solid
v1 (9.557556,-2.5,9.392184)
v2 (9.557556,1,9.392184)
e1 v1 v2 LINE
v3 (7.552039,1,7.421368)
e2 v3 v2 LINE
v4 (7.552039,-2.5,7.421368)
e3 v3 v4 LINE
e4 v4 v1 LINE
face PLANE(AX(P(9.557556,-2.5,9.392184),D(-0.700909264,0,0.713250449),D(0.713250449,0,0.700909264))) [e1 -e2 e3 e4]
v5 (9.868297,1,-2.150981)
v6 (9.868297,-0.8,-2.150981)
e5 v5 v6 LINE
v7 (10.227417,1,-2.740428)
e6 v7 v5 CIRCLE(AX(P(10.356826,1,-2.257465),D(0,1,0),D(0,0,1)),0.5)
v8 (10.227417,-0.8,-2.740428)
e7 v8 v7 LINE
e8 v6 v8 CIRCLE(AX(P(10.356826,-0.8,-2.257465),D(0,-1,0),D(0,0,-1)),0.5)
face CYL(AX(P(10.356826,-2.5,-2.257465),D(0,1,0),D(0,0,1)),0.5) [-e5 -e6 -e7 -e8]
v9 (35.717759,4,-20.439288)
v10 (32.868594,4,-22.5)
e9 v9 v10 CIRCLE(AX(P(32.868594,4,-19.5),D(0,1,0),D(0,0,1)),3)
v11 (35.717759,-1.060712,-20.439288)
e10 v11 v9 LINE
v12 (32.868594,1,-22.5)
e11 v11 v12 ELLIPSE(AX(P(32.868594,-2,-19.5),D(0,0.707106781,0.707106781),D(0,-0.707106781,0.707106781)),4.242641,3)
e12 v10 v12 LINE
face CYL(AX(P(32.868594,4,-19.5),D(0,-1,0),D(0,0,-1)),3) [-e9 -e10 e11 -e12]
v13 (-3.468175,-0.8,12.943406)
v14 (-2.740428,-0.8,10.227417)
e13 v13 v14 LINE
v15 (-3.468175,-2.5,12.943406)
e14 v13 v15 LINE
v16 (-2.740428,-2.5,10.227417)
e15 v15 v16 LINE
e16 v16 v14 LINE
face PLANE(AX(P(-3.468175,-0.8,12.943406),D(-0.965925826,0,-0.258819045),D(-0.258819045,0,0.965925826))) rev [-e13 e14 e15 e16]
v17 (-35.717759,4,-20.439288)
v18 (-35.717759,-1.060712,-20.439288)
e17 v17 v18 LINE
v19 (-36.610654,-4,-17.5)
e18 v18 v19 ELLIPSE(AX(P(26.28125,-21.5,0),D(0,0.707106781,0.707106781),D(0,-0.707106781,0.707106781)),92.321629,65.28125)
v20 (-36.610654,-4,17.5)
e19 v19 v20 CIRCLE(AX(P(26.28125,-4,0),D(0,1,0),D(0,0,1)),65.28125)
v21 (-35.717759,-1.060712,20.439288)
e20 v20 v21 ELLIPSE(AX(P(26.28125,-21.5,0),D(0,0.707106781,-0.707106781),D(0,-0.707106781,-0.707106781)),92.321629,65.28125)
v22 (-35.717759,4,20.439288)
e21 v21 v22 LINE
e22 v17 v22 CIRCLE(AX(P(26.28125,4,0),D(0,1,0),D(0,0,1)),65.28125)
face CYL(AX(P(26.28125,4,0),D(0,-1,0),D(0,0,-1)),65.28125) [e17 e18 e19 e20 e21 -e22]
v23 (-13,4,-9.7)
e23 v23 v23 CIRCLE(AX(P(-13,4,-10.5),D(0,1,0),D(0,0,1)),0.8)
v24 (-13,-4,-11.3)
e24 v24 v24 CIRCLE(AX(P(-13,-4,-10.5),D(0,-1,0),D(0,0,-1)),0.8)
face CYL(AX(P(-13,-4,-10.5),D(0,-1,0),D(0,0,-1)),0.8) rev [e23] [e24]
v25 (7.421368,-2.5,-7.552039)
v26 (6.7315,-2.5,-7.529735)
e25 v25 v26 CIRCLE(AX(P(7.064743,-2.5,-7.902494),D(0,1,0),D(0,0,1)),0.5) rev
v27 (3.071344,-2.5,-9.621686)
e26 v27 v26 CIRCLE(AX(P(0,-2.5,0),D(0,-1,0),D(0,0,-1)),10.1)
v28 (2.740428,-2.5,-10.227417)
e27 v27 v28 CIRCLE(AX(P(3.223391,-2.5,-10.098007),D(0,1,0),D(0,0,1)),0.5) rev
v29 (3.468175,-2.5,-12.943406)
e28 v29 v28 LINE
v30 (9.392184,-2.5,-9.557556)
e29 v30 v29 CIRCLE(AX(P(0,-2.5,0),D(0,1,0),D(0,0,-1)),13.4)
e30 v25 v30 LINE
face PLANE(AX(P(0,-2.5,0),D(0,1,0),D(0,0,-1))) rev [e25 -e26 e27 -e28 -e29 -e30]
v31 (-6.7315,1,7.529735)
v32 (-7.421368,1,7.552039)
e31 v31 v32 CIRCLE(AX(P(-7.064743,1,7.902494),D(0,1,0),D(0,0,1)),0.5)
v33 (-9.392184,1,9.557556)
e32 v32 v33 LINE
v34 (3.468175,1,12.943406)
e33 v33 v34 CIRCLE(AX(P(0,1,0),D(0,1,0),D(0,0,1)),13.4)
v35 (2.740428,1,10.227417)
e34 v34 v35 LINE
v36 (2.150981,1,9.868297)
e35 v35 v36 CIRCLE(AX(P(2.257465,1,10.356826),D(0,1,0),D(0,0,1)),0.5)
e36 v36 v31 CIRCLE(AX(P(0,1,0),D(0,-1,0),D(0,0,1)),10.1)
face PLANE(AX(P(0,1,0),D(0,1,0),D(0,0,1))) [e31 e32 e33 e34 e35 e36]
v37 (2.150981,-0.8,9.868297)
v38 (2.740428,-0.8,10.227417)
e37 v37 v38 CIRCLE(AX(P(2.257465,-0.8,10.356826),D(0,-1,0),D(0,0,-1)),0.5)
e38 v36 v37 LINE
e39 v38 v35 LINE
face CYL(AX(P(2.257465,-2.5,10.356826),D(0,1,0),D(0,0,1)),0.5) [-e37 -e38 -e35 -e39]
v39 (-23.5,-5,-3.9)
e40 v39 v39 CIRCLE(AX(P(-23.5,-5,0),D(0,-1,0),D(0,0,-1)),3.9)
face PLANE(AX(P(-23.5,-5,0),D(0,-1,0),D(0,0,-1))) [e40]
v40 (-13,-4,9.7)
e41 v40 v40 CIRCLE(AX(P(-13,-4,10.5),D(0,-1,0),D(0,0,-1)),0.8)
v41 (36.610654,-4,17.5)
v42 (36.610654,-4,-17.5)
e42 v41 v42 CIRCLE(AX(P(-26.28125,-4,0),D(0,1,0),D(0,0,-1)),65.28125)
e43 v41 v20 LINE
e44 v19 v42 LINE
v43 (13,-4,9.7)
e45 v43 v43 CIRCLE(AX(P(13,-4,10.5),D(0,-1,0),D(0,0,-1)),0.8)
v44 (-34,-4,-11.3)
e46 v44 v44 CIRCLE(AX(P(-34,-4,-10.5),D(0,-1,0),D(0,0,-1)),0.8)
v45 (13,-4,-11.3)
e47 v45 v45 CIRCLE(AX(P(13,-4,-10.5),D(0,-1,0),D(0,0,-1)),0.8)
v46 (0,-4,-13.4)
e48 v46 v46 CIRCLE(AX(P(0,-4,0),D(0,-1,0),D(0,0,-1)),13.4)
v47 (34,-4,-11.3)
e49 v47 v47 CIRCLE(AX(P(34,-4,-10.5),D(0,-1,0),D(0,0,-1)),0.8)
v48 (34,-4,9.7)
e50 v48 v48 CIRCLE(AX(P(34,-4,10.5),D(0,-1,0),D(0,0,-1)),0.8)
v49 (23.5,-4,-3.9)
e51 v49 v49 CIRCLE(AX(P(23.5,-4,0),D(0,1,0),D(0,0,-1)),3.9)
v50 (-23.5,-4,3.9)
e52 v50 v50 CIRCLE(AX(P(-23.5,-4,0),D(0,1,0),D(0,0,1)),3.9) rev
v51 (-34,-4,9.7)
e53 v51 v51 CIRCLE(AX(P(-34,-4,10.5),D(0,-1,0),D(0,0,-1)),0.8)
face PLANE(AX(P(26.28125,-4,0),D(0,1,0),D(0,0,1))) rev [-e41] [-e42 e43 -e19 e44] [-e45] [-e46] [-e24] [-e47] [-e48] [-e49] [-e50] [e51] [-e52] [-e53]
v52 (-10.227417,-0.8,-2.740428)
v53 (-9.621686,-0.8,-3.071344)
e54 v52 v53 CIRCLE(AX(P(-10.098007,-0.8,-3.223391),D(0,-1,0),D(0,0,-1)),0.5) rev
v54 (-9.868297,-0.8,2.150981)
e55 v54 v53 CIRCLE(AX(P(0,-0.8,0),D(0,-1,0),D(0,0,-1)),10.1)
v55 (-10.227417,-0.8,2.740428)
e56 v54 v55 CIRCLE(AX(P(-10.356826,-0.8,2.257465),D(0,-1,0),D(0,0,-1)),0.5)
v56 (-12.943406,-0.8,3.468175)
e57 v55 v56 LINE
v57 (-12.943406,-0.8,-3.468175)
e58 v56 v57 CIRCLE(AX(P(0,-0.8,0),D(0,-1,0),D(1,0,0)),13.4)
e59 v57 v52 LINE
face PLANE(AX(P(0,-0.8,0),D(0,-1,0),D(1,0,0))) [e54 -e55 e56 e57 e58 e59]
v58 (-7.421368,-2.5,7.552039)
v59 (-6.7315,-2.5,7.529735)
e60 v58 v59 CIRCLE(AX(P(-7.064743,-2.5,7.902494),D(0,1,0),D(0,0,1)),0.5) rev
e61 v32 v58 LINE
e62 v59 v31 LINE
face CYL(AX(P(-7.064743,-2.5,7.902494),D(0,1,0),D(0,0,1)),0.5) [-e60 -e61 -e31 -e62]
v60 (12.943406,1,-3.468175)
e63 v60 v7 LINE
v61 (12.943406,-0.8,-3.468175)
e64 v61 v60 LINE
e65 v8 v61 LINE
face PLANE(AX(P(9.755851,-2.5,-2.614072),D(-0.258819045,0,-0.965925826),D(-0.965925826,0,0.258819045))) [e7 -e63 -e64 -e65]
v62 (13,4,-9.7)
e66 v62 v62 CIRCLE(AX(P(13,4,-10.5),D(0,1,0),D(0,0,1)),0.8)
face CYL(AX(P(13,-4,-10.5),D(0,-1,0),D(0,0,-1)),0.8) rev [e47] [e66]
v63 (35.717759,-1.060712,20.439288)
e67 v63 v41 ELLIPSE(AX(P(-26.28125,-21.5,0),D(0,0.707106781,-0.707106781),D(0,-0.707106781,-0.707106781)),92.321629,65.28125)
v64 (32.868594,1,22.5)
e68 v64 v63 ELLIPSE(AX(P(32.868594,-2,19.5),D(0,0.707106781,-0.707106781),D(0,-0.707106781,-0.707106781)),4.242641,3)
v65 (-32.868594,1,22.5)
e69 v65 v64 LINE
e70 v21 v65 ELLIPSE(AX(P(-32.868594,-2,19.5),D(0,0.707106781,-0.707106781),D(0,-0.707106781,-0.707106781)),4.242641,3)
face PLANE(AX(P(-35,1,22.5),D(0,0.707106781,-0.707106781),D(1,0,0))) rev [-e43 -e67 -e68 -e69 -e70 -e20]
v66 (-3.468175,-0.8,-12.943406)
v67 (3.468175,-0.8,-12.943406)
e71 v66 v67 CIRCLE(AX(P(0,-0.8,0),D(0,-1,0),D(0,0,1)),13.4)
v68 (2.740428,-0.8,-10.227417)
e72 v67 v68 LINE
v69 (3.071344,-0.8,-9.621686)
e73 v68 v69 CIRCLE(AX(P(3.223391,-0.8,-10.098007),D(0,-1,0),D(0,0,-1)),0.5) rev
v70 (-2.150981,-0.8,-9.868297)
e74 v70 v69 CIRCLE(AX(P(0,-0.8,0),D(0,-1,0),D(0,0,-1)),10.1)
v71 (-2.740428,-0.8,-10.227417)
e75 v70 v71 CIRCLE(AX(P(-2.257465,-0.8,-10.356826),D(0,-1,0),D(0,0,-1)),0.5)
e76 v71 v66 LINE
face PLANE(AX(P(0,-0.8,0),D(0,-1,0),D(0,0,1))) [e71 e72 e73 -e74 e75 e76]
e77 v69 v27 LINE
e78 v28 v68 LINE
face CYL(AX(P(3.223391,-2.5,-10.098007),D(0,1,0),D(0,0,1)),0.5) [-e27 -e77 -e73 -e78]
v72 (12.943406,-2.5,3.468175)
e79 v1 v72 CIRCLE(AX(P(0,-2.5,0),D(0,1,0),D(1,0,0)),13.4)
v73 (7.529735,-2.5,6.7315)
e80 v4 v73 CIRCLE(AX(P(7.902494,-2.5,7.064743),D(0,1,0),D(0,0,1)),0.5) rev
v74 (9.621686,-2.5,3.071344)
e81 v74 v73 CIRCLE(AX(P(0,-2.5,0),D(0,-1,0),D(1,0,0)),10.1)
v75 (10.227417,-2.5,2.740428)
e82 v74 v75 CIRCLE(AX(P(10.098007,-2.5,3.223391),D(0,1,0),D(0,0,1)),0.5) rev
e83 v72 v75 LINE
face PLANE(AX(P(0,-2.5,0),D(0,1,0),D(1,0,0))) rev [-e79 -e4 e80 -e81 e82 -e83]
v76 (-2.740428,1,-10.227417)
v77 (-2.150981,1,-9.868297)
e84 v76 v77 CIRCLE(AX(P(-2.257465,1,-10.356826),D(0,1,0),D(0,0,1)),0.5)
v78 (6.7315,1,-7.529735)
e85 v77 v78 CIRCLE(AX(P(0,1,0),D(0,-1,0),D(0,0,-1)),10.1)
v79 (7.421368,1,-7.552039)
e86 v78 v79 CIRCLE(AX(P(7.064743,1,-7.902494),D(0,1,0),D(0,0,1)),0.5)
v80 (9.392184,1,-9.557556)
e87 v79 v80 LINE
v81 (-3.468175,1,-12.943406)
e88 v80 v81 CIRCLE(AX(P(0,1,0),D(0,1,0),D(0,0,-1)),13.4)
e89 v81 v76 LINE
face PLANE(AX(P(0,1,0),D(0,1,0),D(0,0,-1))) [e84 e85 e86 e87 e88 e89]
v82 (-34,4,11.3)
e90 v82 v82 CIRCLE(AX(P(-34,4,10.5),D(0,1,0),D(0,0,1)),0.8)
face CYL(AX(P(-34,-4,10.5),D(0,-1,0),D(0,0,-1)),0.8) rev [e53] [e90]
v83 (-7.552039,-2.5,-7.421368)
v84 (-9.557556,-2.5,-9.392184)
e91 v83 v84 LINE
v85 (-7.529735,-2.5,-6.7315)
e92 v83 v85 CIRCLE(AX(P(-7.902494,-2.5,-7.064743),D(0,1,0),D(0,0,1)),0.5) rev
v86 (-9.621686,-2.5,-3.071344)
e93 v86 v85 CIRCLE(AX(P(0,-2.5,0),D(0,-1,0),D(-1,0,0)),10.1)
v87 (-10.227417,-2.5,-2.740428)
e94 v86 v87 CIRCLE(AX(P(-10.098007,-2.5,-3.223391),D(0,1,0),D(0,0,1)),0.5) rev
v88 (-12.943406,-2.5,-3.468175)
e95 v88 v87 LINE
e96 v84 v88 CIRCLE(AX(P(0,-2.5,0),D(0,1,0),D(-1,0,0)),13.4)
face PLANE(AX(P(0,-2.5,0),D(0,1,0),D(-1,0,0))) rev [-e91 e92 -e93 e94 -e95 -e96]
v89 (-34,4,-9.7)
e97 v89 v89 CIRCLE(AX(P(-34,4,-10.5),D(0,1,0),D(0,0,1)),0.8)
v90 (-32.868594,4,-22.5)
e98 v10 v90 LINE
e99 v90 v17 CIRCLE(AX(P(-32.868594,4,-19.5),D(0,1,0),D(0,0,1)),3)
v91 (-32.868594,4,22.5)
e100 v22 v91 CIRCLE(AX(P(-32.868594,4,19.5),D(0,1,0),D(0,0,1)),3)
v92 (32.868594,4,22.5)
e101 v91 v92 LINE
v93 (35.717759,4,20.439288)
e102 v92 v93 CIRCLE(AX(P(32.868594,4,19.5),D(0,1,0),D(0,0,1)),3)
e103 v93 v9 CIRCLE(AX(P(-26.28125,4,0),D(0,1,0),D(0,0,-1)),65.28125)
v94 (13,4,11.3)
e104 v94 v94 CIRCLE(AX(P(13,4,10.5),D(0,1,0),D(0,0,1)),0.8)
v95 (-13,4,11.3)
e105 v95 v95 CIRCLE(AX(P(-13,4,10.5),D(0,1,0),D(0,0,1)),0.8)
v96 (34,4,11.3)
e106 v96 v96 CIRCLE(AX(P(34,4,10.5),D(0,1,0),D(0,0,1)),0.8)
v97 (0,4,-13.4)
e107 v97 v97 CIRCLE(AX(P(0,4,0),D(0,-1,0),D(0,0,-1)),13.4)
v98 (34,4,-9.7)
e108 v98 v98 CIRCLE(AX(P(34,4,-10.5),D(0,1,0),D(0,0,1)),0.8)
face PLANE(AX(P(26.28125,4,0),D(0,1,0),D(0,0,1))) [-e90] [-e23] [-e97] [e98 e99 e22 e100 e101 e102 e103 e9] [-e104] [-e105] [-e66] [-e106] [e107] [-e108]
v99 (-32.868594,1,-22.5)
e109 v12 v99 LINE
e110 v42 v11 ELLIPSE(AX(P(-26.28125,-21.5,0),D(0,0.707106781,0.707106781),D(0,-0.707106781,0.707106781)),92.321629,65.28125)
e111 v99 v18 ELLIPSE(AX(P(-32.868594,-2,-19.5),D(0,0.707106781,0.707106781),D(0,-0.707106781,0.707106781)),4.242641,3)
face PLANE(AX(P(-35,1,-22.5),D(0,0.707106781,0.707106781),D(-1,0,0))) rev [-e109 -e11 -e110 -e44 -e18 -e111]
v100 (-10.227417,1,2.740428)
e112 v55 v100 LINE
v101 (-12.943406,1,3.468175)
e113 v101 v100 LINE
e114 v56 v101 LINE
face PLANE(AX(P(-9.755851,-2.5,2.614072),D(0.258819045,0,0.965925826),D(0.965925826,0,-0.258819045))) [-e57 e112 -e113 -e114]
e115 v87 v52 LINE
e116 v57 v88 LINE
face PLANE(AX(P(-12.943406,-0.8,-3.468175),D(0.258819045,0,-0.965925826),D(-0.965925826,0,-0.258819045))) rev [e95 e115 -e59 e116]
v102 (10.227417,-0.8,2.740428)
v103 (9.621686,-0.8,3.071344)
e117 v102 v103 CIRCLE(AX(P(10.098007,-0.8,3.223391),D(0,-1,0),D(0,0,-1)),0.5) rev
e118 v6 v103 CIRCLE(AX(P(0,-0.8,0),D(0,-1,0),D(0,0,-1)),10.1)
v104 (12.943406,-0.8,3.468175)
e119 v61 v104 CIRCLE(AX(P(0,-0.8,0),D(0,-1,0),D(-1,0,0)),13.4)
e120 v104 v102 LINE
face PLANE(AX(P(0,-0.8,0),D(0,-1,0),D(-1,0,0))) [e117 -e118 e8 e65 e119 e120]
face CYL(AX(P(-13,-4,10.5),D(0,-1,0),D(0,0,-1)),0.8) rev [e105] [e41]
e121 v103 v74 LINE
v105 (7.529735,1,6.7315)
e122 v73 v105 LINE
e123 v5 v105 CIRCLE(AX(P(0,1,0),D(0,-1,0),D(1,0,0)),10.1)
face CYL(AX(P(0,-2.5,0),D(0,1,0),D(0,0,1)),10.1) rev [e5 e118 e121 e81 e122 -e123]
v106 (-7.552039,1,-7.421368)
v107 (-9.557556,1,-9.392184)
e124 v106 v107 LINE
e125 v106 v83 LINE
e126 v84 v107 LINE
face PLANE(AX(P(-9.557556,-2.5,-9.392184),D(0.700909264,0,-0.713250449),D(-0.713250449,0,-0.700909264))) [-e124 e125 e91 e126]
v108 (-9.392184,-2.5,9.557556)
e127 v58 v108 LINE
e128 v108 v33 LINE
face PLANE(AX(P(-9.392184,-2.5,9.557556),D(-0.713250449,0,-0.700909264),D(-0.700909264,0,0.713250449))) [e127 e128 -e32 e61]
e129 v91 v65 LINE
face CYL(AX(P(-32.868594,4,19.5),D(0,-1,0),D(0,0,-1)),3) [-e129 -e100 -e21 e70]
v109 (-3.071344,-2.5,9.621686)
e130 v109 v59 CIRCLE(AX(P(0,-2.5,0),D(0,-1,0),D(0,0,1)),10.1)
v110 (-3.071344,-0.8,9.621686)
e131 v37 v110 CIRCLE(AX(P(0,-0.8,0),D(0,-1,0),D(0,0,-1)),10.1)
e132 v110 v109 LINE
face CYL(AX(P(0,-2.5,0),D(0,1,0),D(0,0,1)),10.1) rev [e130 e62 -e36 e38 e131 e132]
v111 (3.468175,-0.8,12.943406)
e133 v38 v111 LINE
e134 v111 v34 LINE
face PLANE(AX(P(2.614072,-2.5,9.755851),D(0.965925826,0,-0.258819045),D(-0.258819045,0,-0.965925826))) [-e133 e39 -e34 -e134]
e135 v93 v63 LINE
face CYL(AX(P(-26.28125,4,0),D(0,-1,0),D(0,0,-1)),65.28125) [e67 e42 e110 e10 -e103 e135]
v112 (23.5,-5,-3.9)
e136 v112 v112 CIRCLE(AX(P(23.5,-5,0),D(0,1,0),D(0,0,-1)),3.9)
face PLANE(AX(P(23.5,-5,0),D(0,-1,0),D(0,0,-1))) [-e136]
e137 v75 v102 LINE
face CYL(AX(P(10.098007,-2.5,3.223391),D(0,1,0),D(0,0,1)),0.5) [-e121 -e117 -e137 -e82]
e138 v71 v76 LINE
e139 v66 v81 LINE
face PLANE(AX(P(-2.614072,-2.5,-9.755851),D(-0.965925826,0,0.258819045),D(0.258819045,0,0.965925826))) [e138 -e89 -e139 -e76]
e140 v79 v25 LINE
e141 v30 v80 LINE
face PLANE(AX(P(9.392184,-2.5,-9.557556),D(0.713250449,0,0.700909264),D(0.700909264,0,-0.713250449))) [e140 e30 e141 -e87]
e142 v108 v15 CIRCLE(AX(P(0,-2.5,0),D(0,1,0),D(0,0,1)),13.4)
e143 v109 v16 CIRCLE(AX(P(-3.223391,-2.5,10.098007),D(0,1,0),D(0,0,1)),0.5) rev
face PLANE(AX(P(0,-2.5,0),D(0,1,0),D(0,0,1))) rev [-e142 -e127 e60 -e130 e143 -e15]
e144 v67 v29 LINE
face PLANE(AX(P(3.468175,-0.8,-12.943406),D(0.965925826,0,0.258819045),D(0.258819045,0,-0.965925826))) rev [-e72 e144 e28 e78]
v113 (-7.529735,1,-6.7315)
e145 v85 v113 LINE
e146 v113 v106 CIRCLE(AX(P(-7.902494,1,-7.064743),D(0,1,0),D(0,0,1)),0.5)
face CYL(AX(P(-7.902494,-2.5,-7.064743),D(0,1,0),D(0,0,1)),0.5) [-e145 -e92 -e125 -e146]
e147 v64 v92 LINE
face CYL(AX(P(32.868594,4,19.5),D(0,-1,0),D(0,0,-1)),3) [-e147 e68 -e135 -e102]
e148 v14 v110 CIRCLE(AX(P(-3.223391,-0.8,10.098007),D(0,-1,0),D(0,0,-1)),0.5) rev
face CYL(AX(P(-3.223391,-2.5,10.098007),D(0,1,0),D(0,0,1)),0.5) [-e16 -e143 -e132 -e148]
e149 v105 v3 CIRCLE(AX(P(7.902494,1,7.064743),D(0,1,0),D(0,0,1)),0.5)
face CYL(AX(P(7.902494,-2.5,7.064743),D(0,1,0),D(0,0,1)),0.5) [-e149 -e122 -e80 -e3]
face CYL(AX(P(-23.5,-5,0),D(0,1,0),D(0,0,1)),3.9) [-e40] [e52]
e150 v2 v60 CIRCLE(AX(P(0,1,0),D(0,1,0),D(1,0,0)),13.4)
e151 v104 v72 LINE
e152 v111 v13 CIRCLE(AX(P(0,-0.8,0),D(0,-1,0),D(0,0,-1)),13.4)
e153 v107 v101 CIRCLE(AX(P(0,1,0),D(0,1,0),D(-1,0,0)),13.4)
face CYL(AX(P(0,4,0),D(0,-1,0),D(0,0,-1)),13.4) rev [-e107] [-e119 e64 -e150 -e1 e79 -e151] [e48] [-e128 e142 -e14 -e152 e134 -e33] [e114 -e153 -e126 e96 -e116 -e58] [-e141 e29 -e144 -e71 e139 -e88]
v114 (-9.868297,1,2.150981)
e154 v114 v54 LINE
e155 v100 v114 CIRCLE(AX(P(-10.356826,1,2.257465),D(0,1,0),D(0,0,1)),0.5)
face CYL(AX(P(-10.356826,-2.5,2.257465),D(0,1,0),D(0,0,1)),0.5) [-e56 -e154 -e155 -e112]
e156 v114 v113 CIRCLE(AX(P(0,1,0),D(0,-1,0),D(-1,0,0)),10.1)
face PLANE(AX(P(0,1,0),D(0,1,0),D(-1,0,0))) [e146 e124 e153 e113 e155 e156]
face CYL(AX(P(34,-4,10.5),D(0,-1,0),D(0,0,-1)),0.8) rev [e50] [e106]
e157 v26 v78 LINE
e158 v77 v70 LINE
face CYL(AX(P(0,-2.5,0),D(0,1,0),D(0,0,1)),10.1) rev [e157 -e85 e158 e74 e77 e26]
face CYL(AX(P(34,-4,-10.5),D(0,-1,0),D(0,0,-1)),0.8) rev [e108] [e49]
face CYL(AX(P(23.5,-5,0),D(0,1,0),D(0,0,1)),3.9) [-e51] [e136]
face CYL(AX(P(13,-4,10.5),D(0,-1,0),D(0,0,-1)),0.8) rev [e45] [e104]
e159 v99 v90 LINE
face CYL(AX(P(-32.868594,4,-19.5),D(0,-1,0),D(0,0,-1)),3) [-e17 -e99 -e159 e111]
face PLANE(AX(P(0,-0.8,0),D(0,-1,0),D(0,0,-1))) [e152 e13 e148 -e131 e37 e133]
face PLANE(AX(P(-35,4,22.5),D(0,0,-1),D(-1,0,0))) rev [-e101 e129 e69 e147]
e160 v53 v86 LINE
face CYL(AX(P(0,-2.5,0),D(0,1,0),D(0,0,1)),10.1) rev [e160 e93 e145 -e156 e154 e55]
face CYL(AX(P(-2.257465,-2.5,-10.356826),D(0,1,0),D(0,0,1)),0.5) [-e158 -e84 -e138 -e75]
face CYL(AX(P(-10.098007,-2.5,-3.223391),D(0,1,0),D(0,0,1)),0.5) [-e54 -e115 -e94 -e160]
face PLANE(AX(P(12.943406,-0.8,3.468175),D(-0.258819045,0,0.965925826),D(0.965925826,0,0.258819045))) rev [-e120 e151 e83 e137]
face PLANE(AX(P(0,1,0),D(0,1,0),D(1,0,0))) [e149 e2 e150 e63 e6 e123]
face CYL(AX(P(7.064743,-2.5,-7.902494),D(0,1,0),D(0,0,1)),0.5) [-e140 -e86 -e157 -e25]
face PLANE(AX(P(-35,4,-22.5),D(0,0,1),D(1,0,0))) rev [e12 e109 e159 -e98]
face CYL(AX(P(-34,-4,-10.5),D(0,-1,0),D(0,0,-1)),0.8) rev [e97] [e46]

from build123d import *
from build123d.topology import SkipClean

# Parameters (mm, degrees)
EXTRUDE_1_DEPTH                  = 4
SKETCH_9_R                       = 13.4
CUT_EXTRUDE_1_DEPTH              = 46.730186967
FILLET_4_R                       = 3
CHAMFER_3_SIZE                   = 5
SKETCH_10_R                      = 3.9
EXTRUDE_8_DEPTH                  = 1
PATTERN_CIRCULAR_4_COUNT         = 4
EXTRUDE_START                    = -3.5
EXTRUDE_9_DEPTH                  = 3.5
CUT_EXTRUDE_2_DEPTH              = 1.7
FILLET_5_R                       = 0.5
PATTERN_CIRCULAR_5_COUNT         = 4
FILLET_5_OF_PATTERN_CIRCULAR_5_R = 0.5


with BuildPart() as part:
    # ｽｹｯﾁ2 → ﾎﾞｽ - 押し出し1 (new, symmetric)
    with BuildSketch(Plane(origin=(0, 0, 0), x_dir=(1, 0, 0), z_dir=(0, 1, 0))):
        with BuildLine():
            Line((-35, 22.5), (35, 22.5))
            ThreePointArc((35, 22.5), (39, 0), (35, -22.5))
            Line((35, -22.5), (-35, -22.5))
            ThreePointArc((-35, -22.5), (-39, 0), (-35, 22.5))
        make_face()
    extrude(amount=EXTRUDE_1_DEPTH, both=True)

    # ｽｹｯﾁ9 → ｶｯﾄ - 押し出し1 (cut, through all)
    with BuildSketch(Plane.XZ.offset(4)):
        with Locations(Location((0, 0, 0), (0, 0, 270))):
            Circle(SKETCH_9_R)
    extrude(amount=-CUT_EXTRUDE_1_DEPTH, mode=Mode.SUBTRACT)

    # ﾌｨﾚｯﾄ4
    fillet_4_edges = [part.edges().sort_by_distance(p)[0] for p in [
        (-35, 0, -22.5),
        (35, 0, -22.5),
        (35, 0, 22.5),
        (-35, 0, 22.5),
    ]]
    fillet(fillet_4_edges, radius=FILLET_4_R)

    # 面取り3
    # the kernel refuses this chamfer: 5 mm, written as the material it takes off along each edge
    with BuildSketch(Plane(origin=(-45.727009416, -4, -22.5), x_dir=(0, -0.027495876610586317, 0.9996219169112968), z_dir=(1, 0, 0))) as chamfer_3_piece_1:
        Polygon((CHAMFER_3_SIZE * 0.999621916911, -CHAMFER_3_SIZE * 0.0274958766106), (-CHAMFER_3_SIZE * 0.0274958766106, -CHAMFER_3_SIZE * 0.999621916911), (0, 0), align=None)
    extrude(amount=91.454018832, mode=Mode.SUBTRACT)
    with BuildSketch(Plane(origin=(45.727009416, -4, 22.5), x_dir=(0, 0.9996219169112968, 0.027495876610586317), z_dir=(-1, 0, 0))) as chamfer_3_piece_2:
        Polygon((CHAMFER_3_SIZE * 0.999621916911, CHAMFER_3_SIZE * 0.0274958766106), (-CHAMFER_3_SIZE * 0.0274958766106, CHAMFER_3_SIZE * 0.999621916911), (0, 0), align=None)
    extrude(amount=91.454018832, mode=Mode.SUBTRACT)

    # ｽｹｯﾁ10 → ﾎﾞｽ - 押し出し8 (add)
    with BuildSketch(Plane.XZ.offset(4)):
        with Locations(Location((-23.5, 0, 0), (0, 0, 90))):
            Circle(SKETCH_10_R)
    extrude_8 = extrude(amount=EXTRUDE_8_DEPTH)

    # ｽｹｯﾁ12 → M2 ねじ穴1 (revolve, cut)
    with BuildSketch(Plane(origin=(-13, -4, 10.5), x_dir=(0, 0, -1), z_dir=(1, 0, 0))):
        Polygon((0, 0), (0, 10.480688495), (0.8, 10), (0.8, 0), align=None)
    hole_wizard_m2_1 = revolve(axis=Axis((-13, -10.35, 10.5), (0, 1, 0)), mode=Mode.SUBTRACT)

    # 円形ﾊﾟﾀｰﾝ4: M2 ねじ穴1 ×4 about axis
    pattern_circular_4_axis = Axis((-23.5, 0, 0), (0, 1, 0))
    for i in range(1, PATTERN_CIRCULAR_4_COUNT):
        add(hole_wizard_m2_1.rotate(pattern_circular_4_axis, i * 360 / PATTERN_CIRCULAR_4_COUNT), mode=Mode.SUBTRACT)

    # ﾐﾗｰ3: ﾎﾞｽ - 押し出し8, M2 ねじ穴1 across plane
    add(extrude_8.mirror(Plane(origin=(0, 0, 0), x_dir=(0, 0, 1), z_dir=(1, 0, 0))))
    add(hole_wizard_m2_1.mirror(Plane(origin=(0, 0, 0), x_dir=(0, 0, 1), z_dir=(1, 0, 0))), mode=Mode.SUBTRACT)

    # ﾐﾗｰ3 copy 1 sketch → ﾐﾗｰ3 copy 1 (revolve, cut)
    with BuildSketch(Plane(origin=(13, -4, -10.5), x_dir=(1, 0, 0), z_dir=(0, 0, -1))):
        Polygon((0, 0), (0, -10.480688495), (0.8, -10), (0.8, 0), align=None)
    revolve(axis=Axis((13, -10.35, -10.5), (0, -1, 0)), mode=Mode.SUBTRACT)

    # ﾐﾗｰ3 copy 2 sketch → ﾐﾗｰ3 copy 2 (revolve, cut)
    with BuildSketch(Plane(origin=(34, -4, -10.5), x_dir=(0, 0, 1), z_dir=(1, 0, 0))):
        Polygon((0, 0), (0, -10.480688495), (0.8, -10), (0.8, 0), align=None)
    revolve(axis=Axis((34, -10.35, -10.5), (0, -1, 0)), mode=Mode.SUBTRACT)

    # ﾐﾗｰ3 copy 3 sketch → ﾐﾗｰ3 copy 3 (revolve, cut)
    with BuildSketch(Plane(origin=(34, -4, 10.5), x_dir=(-1, 0, 0), z_dir=(0, 0, 1))):
        Polygon((0, 0), (0, -10.480688495), (0.8, -10), (0.8, 0), align=None)
    revolve(axis=Axis((34, -10.35, 10.5), (0, -1, 0)), mode=Mode.SUBTRACT)

    # ｽｹｯﾁ13 → ﾎﾞｽ - 押し出し9 (add)
    with BuildSketch(Plane(origin=(0, 1, 0), x_dir=(1, 0, 0), z_dir=(0, 1, 0)).offset(EXTRUDE_START)):
        with BuildLine():
            Line((-9.392184142, -9.557556019), (-7.079183569, -7.203829536))
            ThreePointArc((-7.079183569, -7.203829536), (-2.571479677, -9.767163983), (2.614072356, -9.755850846))
            Line((2.614072356, -9.755850846), (3.468175204, -12.943406072))
            ThreePointArc((3.468175204, -12.943406072), (-3.411666106, -12.958415581), (-9.392184142, -9.557556019))
        make_face()
    extrude_9 = extrude(amount=EXTRUDE_9_DEPTH)

    # ｽｹｯﾁ14 → ｶｯﾄ - 押し出し2 (cut)
    with BuildSketch(Plane.XZ.offset(2.5)):
        with BuildLine():
            Line((0, 0), (3.468175204, 12.943406072))
            ThreePointArc((3.468175204, 12.943406072), (0, 13.4), (-3.468175204, 12.943406072))
            Line((-3.468175204, 12.943406072), (0, 0))
        make_face()
    cut_extrude_2 = extrude(amount=-CUT_EXTRUDE_2_DEPTH, mode=Mode.SUBTRACT)

    # ﾌｨﾚｯﾄ5
    fillet_5_edges = [part.edges().sort_by_distance(p)[0] for p in [
        (-7.079183569, -0.75, 7.203829536),
        (2.614072356, 0.1, 9.755850846),
        (-2.614072356, -1.65, 9.755850846),
    ]]
    fillet(fillet_5_edges, radius=FILLET_5_R)

    # 円形ﾊﾟﾀｰﾝ5: ﾎﾞｽ - 押し出し9, ｶｯﾄ - 押し出し2 ×4 about axis
    with SkipClean():  # the faces are left unmerged after this step: merging them gives an invalid solid
        pattern_circular_5_axis = Axis((0, 0, 0), (0, 1, 0))
        add([extrude_9.rotate(pattern_circular_5_axis, i * 360 / PATTERN_CIRCULAR_5_COUNT) for i in range(1, PATTERN_CIRCULAR_5_COUNT)])
        add([cut_extrude_2.rotate(pattern_circular_5_axis, i * 360 / PATTERN_CIRCULAR_5_COUNT) for i in range(1, PATTERN_CIRCULAR_5_COUNT)], mode=Mode.SUBTRACT)

    # ﾌｨﾚｯﾄ5 of 円形ﾊﾟﾀｰﾝ5
    fillet_5_of_pattern_circular_5_edges = [part.edges().sort_by_distance(p)[0] for p in [
        (7.203829536, -0.75, 7.079183569),
        (9.755850846, 0.1, -2.614072356),
        (9.755850846, -1.65, 2.614072356),
        (7.079183569, -0.75, -7.203829536),
        (-2.614072356, 0.1, -9.755850846),
        (2.614072356, -1.65, -9.755850846),
        (-7.203829536, -0.75, -7.079183569),
        (-9.755850846, 0.1, 2.614072356),
        (-9.755850846, -1.65, -2.614072356),
    ]]
    fillet(fillet_5_of_pattern_circular_5_edges, radius=FILLET_5_OF_PATTERN_CIRCULAR_5_R)


solid = part.part
